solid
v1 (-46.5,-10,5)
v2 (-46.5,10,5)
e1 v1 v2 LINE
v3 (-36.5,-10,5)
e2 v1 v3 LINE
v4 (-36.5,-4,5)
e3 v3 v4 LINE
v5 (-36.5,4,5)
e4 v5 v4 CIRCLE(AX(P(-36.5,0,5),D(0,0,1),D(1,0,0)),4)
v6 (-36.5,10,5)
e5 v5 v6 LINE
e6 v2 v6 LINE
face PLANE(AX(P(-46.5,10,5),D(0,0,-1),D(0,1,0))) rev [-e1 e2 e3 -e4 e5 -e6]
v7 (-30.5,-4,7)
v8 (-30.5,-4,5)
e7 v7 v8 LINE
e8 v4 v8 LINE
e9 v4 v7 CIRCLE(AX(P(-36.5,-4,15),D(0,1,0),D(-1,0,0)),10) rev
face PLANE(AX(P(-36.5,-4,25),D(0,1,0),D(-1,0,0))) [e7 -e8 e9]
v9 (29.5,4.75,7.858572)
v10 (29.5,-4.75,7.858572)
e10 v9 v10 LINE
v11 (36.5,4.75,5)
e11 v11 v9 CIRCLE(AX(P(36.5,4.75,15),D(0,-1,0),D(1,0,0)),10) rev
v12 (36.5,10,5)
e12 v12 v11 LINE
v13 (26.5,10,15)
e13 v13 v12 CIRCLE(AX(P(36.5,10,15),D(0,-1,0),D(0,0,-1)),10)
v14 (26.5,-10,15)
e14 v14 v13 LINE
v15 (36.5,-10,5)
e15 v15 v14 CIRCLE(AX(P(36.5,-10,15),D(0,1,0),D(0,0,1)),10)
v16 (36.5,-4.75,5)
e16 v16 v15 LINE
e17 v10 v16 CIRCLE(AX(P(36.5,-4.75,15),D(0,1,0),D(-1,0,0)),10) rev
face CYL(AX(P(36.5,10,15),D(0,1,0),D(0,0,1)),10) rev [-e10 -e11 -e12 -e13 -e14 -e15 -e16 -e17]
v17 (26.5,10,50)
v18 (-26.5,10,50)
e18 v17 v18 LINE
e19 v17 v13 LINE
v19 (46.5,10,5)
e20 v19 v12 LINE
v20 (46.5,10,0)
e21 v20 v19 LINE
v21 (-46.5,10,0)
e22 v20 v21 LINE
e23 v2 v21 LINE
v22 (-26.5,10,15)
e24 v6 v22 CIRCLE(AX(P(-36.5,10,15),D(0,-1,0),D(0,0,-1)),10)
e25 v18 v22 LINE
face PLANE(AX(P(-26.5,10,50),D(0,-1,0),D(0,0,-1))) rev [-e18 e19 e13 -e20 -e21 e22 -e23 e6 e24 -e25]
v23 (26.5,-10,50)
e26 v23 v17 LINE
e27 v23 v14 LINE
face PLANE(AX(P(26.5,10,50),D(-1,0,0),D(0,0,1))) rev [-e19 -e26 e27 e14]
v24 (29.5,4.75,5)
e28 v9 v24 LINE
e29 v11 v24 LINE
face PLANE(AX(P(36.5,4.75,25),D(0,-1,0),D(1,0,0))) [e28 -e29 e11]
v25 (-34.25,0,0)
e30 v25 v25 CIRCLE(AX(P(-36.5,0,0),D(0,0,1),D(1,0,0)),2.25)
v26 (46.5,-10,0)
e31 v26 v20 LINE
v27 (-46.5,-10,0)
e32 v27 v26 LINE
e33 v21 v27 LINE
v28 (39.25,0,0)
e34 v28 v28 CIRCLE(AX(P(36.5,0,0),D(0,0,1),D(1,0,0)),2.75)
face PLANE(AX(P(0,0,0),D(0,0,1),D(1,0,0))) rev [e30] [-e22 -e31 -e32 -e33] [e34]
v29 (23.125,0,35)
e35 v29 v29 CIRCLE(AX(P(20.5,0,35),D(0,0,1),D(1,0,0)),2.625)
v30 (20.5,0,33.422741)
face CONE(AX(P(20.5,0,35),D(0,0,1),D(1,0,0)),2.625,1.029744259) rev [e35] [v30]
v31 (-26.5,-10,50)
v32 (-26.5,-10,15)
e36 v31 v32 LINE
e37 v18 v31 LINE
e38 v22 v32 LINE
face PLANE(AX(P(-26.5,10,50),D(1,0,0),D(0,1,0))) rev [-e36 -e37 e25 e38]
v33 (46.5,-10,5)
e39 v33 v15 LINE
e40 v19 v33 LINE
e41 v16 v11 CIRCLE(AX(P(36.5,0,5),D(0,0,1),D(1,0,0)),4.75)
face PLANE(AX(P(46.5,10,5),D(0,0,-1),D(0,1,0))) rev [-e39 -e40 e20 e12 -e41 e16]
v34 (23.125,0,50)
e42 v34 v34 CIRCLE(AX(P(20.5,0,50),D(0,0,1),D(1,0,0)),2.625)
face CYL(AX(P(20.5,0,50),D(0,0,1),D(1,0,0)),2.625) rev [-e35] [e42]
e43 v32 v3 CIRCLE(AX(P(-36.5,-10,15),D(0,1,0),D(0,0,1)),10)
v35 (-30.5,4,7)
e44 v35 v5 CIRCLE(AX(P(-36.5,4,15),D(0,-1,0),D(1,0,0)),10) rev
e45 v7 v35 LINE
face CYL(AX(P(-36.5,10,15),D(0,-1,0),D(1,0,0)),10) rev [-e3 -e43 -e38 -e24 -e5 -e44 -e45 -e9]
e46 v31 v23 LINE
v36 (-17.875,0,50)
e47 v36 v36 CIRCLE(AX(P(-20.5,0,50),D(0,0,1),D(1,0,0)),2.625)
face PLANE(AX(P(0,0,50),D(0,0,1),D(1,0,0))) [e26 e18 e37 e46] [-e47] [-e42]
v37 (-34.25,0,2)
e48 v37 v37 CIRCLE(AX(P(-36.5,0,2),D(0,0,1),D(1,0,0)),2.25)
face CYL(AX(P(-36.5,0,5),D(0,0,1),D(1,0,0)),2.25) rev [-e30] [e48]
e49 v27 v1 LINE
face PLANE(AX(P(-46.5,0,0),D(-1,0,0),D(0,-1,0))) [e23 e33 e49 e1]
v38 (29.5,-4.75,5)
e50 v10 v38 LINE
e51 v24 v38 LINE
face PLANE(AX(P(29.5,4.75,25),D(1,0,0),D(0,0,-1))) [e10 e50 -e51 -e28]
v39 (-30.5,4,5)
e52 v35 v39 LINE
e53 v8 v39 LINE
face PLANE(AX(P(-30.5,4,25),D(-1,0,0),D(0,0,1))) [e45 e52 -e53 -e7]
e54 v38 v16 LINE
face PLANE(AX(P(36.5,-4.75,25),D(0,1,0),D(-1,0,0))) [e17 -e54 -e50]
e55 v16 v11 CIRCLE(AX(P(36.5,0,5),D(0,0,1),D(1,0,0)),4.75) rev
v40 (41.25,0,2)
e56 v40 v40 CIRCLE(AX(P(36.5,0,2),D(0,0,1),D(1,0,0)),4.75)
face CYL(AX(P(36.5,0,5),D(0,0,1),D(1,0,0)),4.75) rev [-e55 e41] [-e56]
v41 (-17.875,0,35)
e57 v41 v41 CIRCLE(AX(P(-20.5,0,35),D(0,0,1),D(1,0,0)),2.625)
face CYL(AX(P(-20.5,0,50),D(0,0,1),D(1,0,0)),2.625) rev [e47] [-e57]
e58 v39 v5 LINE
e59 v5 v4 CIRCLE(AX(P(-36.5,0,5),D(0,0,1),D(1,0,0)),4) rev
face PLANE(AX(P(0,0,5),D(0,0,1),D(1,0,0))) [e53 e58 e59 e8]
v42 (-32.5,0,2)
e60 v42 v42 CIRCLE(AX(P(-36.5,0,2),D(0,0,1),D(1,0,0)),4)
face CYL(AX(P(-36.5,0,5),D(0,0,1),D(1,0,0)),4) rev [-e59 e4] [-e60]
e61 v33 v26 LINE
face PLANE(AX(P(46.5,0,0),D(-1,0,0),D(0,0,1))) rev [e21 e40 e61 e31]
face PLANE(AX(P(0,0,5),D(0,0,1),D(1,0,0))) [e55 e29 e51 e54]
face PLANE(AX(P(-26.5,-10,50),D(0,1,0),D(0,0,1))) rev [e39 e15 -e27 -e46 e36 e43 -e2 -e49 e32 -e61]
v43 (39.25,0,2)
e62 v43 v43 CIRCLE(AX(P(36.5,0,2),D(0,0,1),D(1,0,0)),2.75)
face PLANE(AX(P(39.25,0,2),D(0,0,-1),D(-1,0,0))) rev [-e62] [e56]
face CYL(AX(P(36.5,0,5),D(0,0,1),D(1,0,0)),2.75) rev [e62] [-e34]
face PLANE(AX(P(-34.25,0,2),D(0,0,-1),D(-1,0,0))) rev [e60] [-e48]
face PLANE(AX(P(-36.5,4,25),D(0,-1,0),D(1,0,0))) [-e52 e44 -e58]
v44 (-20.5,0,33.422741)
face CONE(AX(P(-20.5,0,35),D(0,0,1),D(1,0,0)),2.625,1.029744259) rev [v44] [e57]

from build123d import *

# Parameters (mm, degrees)
SKETCH_1_W                     = 53
SKETCH_1_H                     = 20
EXTRUDE_1_DEPTH                = 50
HOLE_WIZARD_M5_1_D             = 5.25
HOLE_WIZARD_M5_1_DEPTH         = 15
HOLE_WIZARD_M5_1_TIP           = 1.577259125
SKETCH_4_W                     = 5
SKETCH_4_H                     = 20
EXTRUDE_2_DEPTH                = 20
HOLE_WIZARD_M4_1_D             = 4.5
HOLE_WIZARD_M4_1_DEPTH         = 15
HOLE_WIZARD_M4_1_CBORE_D       = 8
HOLE_WIZARD_M4_1_CBORE_DEPTH   = 3
HOLE_WIZARD_M4_1_TIP           = 1.351936393
SKETCH_7_W                     = 5
SKETCH_7_H                     = 20
EXTRUDE_3_DEPTH                = 20
HOLE_WIZARD_M5_1_2_D           = 5.5
HOLE_WIZARD_M5_1_2_DEPTH       = 15
HOLE_WIZARD_M5_1_2_CBORE_D     = 9.5
HOLE_WIZARD_M5_1_2_CBORE_DEPTH = 3
HOLE_WIZARD_M5_1_2_TIP         = 1.652366702
FILLET_1_R                     = 10
SKETCH_10_W                    = 6
SKETCH_10_H                    = 8
SKETCH_10_W_2                  = 7
SKETCH_10_H_2                  = 9.5
CUT_EXTRUDE_1_DEPTH            = 20


with BuildPart() as part:
    # 스케치1 → 보스-돌출1 (new body)
    with BuildSketch(Plane.XY):
        Rectangle(SKETCH_1_W, SKETCH_1_H)
    extrude(amount=EXTRUDE_1_DEPTH)

    # Hole Wizard M5 _ _1
    with Locations(Plane.XY.offset(50)):
        with Locations((20.5, 0), (-20.5, 0)):
            Hole(HOLE_WIZARD_M5_1_D / 2, depth=HOLE_WIZARD_M5_1_DEPTH)
            with Locations((0, 0, -(HOLE_WIZARD_M5_1_DEPTH + HOLE_WIZARD_M5_1_TIP / 2))):  # 118° drill point
                Cone(0, HOLE_WIZARD_M5_1_D / 2, HOLE_WIZARD_M5_1_TIP, mode=Mode.SUBTRACT)

    # 스케치4 → 보스-돌출2 (add)
    with BuildSketch(Plane.ZY.offset(26.5)):
        with Locations((2.5, 0)):
            Rectangle(SKETCH_4_W, SKETCH_4_H)
    extrude(amount=EXTRUDE_2_DEPTH)

    # M4 소켓 머리 캡 나사용 카운터보어1
    with Locations(Plane.XY.offset(5)):
        with Locations((-36.5, 0)):
            CounterBoreHole(HOLE_WIZARD_M4_1_D / 2, HOLE_WIZARD_M4_1_CBORE_D / 2, HOLE_WIZARD_M4_1_CBORE_DEPTH, depth=HOLE_WIZARD_M4_1_DEPTH)
            with Locations((0, 0, -(HOLE_WIZARD_M4_1_DEPTH + HOLE_WIZARD_M4_1_TIP / 2))):  # 118° drill point
                Cone(0, HOLE_WIZARD_M4_1_D / 2, HOLE_WIZARD_M4_1_TIP, mode=Mode.SUBTRACT)

    # 스케치7 → 보스-돌출3 (add)
    with BuildSketch(Plane(origin=(26.5, 0, 0), x_dir=(0, 0, -1), z_dir=(1, 0, 0))):
        with Locations((-2.5, 0)):
            Rectangle(SKETCH_7_W, SKETCH_7_H)
    extrude(amount=EXTRUDE_3_DEPTH)

    # Hole Wizard M5 _ _ _ _ _1 2
    with Locations(Plane.XY.offset(5)):
        with Locations((36.5, 0)):
            CounterBoreHole(HOLE_WIZARD_M5_1_2_D / 2, HOLE_WIZARD_M5_1_2_CBORE_D / 2, HOLE_WIZARD_M5_1_2_CBORE_DEPTH, depth=HOLE_WIZARD_M5_1_2_DEPTH)
            with Locations((0, 0, -(HOLE_WIZARD_M5_1_2_DEPTH + HOLE_WIZARD_M5_1_2_TIP / 2))):  # 118° drill point
                Cone(0, HOLE_WIZARD_M5_1_2_D / 2, HOLE_WIZARD_M5_1_2_TIP, mode=Mode.SUBTRACT)

    # 필렛1
    # the kernel refuses this fillet: 10 mm, written as the material it adds along each edge
    with BuildSketch(Plane(origin=(-26.5, 10, 5), x_dir=(0, 0, 1), z_dir=(0, -1, 0))) as fillet_1_piece_1_section:
        with BuildLine():
            CenterArc((FILLET_1_R, FILLET_1_R), FILLET_1_R, 180, 90)
            Line((0, FILLET_1_R), (0, 0))
            Line((0, 0), (FILLET_1_R, 0))
        make_face()
    fillet_1_piece_1 = extrude(amount=20, mode=Mode.PRIVATE)
    fillet_1_piece_1 = fillet_1_piece_1 - Plane(origin=(-36.5, 0, 7.308851988), x_dir=(1, 0, 0), z_dir=(0, 0, 1)) * Cylinder(4, 81, mode=Mode.PRIVATE)
    add(fillet_1_piece_1)
    with BuildSketch(Plane(origin=(26.5, 10, 5), x_dir=(0, 0, 1), z_dir=(0, -1, 0))) as fillet_1_piece_2_section:
        with BuildLine():
            CenterArc((FILLET_1_R, -FILLET_1_R), FILLET_1_R, 90, 90)
            Line((0, -FILLET_1_R), (0, 0))
            Line((0, 0), (FILLET_1_R, 0))
        make_face()
    fillet_1_piece_2 = extrude(amount=20, mode=Mode.PRIVATE)
    fillet_1_piece_2 = fillet_1_piece_2 - Plane(origin=(36.5, 0, 7.33913119), x_dir=(1, 0, 0), z_dir=(0, 0, 1)) * Cylinder(4.75, 80, mode=Mode.PRIVATE)
    add(fillet_1_piece_2)

    # 스케치10 → 컷-돌출1 (cut)
    with BuildSketch(Plane.XY.offset(5)):
        with Locations((-33.5, 0)):
            Rectangle(SKETCH_10_W, SKETCH_10_H)
        with Locations((33, 0)):
            Rectangle(SKETCH_10_W_2, SKETCH_10_H_2)
    extrude(amount=CUT_EXTRUDE_1_DEPTH, mode=Mode.SUBTRACT)


solid = part.part
